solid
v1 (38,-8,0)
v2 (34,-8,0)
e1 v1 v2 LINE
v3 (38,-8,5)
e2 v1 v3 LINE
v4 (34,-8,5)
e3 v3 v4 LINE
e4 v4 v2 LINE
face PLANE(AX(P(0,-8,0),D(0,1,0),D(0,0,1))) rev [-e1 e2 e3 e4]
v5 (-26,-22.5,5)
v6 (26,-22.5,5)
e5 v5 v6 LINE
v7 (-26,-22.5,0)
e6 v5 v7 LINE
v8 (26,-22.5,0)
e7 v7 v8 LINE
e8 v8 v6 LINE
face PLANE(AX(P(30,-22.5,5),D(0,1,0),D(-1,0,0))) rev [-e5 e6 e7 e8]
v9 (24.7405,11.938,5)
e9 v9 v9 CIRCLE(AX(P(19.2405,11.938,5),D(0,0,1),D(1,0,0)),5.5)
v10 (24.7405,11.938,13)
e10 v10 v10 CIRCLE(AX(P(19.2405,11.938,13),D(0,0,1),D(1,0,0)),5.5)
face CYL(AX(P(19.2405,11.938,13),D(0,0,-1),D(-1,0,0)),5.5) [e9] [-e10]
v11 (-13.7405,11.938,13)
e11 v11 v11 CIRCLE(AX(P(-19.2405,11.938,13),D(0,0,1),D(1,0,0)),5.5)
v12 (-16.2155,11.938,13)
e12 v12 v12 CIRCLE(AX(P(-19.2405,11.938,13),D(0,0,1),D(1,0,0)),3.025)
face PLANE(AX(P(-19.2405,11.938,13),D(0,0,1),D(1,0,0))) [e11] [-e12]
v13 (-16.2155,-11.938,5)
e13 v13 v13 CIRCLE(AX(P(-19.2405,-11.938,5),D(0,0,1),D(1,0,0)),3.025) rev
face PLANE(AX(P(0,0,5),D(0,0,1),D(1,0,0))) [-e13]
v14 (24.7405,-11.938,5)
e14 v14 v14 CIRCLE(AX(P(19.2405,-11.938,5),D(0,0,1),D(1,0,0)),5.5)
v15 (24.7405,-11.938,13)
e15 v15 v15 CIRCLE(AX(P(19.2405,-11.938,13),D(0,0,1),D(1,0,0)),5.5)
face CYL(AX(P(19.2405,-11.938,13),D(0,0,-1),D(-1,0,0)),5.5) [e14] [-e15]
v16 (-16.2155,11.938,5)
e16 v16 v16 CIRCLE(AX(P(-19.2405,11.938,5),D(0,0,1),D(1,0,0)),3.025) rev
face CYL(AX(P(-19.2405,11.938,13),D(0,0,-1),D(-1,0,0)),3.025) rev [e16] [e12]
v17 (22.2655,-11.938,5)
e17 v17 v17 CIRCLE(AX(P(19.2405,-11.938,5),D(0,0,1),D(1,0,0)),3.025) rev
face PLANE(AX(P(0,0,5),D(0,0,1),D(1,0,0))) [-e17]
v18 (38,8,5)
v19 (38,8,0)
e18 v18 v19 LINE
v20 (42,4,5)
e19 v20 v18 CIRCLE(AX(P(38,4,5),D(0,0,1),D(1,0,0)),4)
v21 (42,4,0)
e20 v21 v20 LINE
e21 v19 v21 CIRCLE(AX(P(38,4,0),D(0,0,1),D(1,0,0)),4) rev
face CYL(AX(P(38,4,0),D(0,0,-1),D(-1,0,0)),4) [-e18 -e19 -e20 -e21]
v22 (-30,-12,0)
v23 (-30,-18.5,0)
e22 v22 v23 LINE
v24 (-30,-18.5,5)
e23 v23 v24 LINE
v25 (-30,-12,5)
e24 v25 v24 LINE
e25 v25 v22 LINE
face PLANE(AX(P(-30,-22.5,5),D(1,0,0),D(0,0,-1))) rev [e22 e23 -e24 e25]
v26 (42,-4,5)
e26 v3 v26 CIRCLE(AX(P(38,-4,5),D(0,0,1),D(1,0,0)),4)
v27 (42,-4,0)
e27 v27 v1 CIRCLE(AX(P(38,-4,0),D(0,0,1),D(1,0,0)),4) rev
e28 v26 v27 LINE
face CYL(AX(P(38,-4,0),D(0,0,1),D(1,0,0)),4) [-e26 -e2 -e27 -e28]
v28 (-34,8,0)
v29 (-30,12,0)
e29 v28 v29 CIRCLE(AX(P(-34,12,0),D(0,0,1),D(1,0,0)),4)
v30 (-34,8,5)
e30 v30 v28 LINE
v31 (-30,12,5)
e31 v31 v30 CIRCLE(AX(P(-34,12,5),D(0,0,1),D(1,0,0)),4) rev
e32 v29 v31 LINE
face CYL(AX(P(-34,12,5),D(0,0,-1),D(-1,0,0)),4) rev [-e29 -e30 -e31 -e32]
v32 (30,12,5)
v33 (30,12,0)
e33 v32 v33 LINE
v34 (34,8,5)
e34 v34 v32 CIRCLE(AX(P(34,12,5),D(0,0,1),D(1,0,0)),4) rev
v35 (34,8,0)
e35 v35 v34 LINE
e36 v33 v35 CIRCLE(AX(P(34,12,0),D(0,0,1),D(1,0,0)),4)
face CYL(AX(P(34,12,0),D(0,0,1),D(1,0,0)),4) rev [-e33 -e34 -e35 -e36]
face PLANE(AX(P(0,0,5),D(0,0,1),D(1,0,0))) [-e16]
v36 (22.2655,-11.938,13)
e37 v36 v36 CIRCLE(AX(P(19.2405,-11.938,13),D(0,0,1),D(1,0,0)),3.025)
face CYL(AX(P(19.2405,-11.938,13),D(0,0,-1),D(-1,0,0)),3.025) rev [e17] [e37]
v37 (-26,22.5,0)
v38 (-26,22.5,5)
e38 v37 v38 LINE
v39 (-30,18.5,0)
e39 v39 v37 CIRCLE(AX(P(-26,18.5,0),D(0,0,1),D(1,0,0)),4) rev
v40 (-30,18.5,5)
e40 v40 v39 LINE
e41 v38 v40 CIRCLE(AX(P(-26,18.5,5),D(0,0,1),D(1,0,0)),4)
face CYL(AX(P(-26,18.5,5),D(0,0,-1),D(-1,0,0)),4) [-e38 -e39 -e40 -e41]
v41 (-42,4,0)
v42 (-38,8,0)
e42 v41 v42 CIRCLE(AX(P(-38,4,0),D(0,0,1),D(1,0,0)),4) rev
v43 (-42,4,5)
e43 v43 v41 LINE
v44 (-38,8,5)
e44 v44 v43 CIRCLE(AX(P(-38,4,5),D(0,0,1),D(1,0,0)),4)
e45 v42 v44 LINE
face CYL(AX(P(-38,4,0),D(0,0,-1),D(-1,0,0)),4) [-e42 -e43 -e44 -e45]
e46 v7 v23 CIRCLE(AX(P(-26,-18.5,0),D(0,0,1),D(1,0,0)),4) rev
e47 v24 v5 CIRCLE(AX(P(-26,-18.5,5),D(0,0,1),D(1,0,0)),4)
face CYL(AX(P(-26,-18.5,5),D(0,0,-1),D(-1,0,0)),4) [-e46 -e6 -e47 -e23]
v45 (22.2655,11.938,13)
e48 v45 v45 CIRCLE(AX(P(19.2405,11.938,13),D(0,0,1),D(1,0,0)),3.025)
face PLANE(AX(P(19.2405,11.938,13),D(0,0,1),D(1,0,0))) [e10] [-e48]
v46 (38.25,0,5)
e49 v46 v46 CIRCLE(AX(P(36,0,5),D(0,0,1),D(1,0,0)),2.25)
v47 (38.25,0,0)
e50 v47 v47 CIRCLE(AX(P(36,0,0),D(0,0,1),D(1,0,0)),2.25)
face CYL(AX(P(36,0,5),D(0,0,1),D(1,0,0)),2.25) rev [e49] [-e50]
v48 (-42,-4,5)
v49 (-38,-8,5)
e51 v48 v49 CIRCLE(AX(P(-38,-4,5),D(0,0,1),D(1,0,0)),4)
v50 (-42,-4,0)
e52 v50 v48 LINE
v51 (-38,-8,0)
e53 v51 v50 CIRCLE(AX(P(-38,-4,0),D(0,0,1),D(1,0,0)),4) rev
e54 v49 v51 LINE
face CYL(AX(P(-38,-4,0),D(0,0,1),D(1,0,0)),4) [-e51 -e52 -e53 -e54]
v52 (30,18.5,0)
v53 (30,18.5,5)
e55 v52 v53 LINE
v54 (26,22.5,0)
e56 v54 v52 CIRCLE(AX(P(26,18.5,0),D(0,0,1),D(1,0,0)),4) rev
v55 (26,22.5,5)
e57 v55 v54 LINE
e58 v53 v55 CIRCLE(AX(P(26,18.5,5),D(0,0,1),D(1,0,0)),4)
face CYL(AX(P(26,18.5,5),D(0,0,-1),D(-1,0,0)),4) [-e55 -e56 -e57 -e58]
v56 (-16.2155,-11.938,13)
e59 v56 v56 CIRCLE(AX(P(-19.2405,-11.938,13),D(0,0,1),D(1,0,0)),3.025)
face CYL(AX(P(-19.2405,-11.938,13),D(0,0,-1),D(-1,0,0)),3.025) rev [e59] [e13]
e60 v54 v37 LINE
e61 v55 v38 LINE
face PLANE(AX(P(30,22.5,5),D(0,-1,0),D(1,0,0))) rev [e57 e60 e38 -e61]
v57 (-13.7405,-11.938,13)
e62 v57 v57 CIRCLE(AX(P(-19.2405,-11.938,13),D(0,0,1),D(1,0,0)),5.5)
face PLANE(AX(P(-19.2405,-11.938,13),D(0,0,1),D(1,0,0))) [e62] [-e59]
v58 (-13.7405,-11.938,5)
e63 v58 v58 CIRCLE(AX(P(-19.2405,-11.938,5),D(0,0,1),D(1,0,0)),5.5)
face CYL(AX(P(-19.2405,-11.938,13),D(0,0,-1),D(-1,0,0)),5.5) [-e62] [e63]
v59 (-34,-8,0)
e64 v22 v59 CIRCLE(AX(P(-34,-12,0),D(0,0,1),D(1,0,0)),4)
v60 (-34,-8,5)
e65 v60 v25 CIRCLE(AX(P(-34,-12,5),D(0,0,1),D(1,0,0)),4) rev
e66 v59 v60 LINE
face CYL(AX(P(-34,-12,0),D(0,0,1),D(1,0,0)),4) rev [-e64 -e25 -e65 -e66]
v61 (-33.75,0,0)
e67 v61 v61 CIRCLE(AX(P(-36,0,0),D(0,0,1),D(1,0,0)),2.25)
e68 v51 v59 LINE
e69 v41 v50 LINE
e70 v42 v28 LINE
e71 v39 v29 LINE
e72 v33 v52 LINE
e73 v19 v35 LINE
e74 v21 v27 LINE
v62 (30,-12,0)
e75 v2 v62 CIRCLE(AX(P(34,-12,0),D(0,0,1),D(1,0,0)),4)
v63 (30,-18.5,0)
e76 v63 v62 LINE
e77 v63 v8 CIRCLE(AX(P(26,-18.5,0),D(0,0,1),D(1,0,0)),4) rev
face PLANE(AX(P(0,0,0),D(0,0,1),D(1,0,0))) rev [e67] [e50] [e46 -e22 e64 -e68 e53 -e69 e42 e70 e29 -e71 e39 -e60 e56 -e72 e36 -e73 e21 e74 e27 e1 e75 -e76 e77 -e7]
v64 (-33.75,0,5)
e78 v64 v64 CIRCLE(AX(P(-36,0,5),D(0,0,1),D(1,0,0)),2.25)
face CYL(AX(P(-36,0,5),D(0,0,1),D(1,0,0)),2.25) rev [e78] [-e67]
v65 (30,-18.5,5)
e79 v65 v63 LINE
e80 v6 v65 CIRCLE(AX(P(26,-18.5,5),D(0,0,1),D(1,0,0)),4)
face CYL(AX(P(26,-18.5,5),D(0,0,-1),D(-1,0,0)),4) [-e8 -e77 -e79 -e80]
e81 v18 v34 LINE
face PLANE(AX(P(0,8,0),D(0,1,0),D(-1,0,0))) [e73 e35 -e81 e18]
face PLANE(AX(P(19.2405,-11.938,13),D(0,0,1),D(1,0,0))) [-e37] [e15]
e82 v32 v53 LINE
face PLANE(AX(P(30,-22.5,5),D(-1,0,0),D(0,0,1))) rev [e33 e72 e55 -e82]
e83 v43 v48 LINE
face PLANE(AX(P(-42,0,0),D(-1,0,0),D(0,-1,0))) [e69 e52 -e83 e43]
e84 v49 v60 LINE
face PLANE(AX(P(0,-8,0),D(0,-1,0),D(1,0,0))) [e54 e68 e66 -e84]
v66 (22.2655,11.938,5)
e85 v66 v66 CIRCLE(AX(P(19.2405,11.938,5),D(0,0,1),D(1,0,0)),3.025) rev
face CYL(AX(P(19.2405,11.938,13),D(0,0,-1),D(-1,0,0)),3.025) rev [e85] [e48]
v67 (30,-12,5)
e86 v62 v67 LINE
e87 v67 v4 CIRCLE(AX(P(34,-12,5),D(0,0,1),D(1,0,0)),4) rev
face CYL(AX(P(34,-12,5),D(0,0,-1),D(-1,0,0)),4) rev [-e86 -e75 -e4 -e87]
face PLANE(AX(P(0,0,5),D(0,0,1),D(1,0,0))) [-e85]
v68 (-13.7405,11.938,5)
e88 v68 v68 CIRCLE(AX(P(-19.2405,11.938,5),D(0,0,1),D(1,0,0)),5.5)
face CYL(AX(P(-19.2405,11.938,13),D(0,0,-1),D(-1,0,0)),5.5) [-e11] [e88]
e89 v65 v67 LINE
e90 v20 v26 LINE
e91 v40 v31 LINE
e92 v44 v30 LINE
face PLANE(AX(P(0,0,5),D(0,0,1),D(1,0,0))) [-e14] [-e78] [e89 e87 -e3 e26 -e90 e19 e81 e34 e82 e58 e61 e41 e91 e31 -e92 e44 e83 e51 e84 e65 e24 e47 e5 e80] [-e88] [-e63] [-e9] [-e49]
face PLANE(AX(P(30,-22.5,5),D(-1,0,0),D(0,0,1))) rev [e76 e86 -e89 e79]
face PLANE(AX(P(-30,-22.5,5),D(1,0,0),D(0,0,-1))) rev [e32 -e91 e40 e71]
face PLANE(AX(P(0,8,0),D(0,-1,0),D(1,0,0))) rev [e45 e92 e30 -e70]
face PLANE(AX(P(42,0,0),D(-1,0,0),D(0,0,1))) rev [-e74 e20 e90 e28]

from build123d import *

# Parameters (mm, degrees)
SKETCH1_W            = 60
SKETCH1_H            = 45
BOSS_EXTRUDE1_DEPTH  = 5
SKETCH3_R            = 5.5
SKETCH3_R_2          = 3.025
BOSS_EXTRUDE2_DEPTH  = 8
SKETCH4_W            = 12
SKETCH4_H            = 16
SKETCH4_R            = 2.55
BOSS_EXTRUDE3_DEPTH  = 5
FILLET1_R            = 4
M4_CLEARANCE_HOLE1_D = 4.5
MIRROR1_OUTLINE_R    = 2.25
MIRROR1_DEPTH        = 5
FILLET2_R            = 4


# Read off the part's stored shape, not the designer's step: Mirror1
with BuildPart() as part:
    # Sketch1 → Boss-Extrude1 (new body)
    with BuildSketch(Plane.XY):
        Rectangle(SKETCH1_W, SKETCH1_H)
    extrude(amount=BOSS_EXTRUDE1_DEPTH)

    # Sketch3 → Boss-Extrude2 (add)
    # profile 1 of 4: a face of its own
    with BuildSketch(Plane.XY.offset(5)):
        with Locations((-19.2405, 11.938)):
            Circle(SKETCH3_R)
        with Locations((-19.2405, 11.938)):
            Circle(SKETCH3_R_2, mode=Mode.SUBTRACT)
    # profile 2 of 4: a face of its own
    with BuildSketch(Plane.XY.offset(5)):
        with Locations((-19.2405, -11.938)):
            Circle(SKETCH3_R)
        with Locations((-19.2405, -11.938)):
            Circle(SKETCH3_R_2, mode=Mode.SUBTRACT)
    # profile 3 of 4: a face of its own
    with BuildSketch(Plane.XY.offset(5)):
        with Locations((19.2405, 11.938)):
            Circle(SKETCH3_R)
        with Locations((19.2405, 11.938)):
            Circle(SKETCH3_R_2, mode=Mode.SUBTRACT)
    # profile 4 of 4: a face of its own
    with BuildSketch(Plane.XY.offset(5)):
        with Locations((19.2405, -11.938)):
            Circle(SKETCH3_R)
        with Locations((19.2405, -11.938)):
            Circle(SKETCH3_R_2, mode=Mode.SUBTRACT)
    extrude(amount=BOSS_EXTRUDE2_DEPTH)

    # Sketch4 → Boss-Extrude3 (add)
    # profile 1 of 2: a face of its own
    with BuildSketch(Plane.XY.offset(5)):
        with Locations((-36, 0)):
            Rectangle(SKETCH4_W, SKETCH4_H)
        with Locations((-36, 0)):
            Circle(SKETCH4_R, mode=Mode.SUBTRACT)
    # profile 2 of 2: a face of its own
    with BuildSketch(Plane.XY.offset(5)):
        with Locations((-36, 0)):
            Circle(SKETCH4_R)
    extrude(amount=-BOSS_EXTRUDE3_DEPTH)

    # Fillet1
    fillet1_edges = [part.edges().sort_by_distance(p)[0] for p in [
        (-42, -8, 2.5),
        (-42, 8, 2.5),
        (-30, 8, 2.5),
        (-30, -8, 2.5),
        (-30, 22.5, 2.5),
        (-30, -22.5, 2.5),
    ]]
    fillet(fillet1_edges, radius=FILLET1_R)

    # M4 Clearance Hole1 (through all)
    with Locations(Plane.XY.offset(5)):
        with Locations((-36, 0)):
            Hole(M4_CLEARANCE_HOLE1_D / 2)

    # Mirror1 outline → Mirror1 (add)
    with BuildSketch(Plane.XY):
        with BuildLine():
            ThreePointArc((42, 4), (40.828427125, 6.828427125), (38, 8))
            Line((38, 8), (30, 8))
            Line((30, 8), (30, -8))
            Line((30, -8), (38, -8))
            ThreePointArc((38, -8), (40.828427125, -6.828427125), (42, -4))
            Line((42, -4), (42, 4))
        make_face()
        with Locations((36, 0)):
            Circle(MIRROR1_OUTLINE_R, mode=Mode.SUBTRACT)
    extrude(amount=MIRROR1_DEPTH)

    # Fillet2
    fillet2_edges = [part.edges().sort_by_distance(p)[0] for p in [
        (30, -8, 2.5),
        (30, 8, 2.5),
        (30, 22.5, 2.5),
        (30, -22.5, 2.5),
    ]]
    fillet(fillet2_edges, radius=FILLET2_R)


solid = part.part
